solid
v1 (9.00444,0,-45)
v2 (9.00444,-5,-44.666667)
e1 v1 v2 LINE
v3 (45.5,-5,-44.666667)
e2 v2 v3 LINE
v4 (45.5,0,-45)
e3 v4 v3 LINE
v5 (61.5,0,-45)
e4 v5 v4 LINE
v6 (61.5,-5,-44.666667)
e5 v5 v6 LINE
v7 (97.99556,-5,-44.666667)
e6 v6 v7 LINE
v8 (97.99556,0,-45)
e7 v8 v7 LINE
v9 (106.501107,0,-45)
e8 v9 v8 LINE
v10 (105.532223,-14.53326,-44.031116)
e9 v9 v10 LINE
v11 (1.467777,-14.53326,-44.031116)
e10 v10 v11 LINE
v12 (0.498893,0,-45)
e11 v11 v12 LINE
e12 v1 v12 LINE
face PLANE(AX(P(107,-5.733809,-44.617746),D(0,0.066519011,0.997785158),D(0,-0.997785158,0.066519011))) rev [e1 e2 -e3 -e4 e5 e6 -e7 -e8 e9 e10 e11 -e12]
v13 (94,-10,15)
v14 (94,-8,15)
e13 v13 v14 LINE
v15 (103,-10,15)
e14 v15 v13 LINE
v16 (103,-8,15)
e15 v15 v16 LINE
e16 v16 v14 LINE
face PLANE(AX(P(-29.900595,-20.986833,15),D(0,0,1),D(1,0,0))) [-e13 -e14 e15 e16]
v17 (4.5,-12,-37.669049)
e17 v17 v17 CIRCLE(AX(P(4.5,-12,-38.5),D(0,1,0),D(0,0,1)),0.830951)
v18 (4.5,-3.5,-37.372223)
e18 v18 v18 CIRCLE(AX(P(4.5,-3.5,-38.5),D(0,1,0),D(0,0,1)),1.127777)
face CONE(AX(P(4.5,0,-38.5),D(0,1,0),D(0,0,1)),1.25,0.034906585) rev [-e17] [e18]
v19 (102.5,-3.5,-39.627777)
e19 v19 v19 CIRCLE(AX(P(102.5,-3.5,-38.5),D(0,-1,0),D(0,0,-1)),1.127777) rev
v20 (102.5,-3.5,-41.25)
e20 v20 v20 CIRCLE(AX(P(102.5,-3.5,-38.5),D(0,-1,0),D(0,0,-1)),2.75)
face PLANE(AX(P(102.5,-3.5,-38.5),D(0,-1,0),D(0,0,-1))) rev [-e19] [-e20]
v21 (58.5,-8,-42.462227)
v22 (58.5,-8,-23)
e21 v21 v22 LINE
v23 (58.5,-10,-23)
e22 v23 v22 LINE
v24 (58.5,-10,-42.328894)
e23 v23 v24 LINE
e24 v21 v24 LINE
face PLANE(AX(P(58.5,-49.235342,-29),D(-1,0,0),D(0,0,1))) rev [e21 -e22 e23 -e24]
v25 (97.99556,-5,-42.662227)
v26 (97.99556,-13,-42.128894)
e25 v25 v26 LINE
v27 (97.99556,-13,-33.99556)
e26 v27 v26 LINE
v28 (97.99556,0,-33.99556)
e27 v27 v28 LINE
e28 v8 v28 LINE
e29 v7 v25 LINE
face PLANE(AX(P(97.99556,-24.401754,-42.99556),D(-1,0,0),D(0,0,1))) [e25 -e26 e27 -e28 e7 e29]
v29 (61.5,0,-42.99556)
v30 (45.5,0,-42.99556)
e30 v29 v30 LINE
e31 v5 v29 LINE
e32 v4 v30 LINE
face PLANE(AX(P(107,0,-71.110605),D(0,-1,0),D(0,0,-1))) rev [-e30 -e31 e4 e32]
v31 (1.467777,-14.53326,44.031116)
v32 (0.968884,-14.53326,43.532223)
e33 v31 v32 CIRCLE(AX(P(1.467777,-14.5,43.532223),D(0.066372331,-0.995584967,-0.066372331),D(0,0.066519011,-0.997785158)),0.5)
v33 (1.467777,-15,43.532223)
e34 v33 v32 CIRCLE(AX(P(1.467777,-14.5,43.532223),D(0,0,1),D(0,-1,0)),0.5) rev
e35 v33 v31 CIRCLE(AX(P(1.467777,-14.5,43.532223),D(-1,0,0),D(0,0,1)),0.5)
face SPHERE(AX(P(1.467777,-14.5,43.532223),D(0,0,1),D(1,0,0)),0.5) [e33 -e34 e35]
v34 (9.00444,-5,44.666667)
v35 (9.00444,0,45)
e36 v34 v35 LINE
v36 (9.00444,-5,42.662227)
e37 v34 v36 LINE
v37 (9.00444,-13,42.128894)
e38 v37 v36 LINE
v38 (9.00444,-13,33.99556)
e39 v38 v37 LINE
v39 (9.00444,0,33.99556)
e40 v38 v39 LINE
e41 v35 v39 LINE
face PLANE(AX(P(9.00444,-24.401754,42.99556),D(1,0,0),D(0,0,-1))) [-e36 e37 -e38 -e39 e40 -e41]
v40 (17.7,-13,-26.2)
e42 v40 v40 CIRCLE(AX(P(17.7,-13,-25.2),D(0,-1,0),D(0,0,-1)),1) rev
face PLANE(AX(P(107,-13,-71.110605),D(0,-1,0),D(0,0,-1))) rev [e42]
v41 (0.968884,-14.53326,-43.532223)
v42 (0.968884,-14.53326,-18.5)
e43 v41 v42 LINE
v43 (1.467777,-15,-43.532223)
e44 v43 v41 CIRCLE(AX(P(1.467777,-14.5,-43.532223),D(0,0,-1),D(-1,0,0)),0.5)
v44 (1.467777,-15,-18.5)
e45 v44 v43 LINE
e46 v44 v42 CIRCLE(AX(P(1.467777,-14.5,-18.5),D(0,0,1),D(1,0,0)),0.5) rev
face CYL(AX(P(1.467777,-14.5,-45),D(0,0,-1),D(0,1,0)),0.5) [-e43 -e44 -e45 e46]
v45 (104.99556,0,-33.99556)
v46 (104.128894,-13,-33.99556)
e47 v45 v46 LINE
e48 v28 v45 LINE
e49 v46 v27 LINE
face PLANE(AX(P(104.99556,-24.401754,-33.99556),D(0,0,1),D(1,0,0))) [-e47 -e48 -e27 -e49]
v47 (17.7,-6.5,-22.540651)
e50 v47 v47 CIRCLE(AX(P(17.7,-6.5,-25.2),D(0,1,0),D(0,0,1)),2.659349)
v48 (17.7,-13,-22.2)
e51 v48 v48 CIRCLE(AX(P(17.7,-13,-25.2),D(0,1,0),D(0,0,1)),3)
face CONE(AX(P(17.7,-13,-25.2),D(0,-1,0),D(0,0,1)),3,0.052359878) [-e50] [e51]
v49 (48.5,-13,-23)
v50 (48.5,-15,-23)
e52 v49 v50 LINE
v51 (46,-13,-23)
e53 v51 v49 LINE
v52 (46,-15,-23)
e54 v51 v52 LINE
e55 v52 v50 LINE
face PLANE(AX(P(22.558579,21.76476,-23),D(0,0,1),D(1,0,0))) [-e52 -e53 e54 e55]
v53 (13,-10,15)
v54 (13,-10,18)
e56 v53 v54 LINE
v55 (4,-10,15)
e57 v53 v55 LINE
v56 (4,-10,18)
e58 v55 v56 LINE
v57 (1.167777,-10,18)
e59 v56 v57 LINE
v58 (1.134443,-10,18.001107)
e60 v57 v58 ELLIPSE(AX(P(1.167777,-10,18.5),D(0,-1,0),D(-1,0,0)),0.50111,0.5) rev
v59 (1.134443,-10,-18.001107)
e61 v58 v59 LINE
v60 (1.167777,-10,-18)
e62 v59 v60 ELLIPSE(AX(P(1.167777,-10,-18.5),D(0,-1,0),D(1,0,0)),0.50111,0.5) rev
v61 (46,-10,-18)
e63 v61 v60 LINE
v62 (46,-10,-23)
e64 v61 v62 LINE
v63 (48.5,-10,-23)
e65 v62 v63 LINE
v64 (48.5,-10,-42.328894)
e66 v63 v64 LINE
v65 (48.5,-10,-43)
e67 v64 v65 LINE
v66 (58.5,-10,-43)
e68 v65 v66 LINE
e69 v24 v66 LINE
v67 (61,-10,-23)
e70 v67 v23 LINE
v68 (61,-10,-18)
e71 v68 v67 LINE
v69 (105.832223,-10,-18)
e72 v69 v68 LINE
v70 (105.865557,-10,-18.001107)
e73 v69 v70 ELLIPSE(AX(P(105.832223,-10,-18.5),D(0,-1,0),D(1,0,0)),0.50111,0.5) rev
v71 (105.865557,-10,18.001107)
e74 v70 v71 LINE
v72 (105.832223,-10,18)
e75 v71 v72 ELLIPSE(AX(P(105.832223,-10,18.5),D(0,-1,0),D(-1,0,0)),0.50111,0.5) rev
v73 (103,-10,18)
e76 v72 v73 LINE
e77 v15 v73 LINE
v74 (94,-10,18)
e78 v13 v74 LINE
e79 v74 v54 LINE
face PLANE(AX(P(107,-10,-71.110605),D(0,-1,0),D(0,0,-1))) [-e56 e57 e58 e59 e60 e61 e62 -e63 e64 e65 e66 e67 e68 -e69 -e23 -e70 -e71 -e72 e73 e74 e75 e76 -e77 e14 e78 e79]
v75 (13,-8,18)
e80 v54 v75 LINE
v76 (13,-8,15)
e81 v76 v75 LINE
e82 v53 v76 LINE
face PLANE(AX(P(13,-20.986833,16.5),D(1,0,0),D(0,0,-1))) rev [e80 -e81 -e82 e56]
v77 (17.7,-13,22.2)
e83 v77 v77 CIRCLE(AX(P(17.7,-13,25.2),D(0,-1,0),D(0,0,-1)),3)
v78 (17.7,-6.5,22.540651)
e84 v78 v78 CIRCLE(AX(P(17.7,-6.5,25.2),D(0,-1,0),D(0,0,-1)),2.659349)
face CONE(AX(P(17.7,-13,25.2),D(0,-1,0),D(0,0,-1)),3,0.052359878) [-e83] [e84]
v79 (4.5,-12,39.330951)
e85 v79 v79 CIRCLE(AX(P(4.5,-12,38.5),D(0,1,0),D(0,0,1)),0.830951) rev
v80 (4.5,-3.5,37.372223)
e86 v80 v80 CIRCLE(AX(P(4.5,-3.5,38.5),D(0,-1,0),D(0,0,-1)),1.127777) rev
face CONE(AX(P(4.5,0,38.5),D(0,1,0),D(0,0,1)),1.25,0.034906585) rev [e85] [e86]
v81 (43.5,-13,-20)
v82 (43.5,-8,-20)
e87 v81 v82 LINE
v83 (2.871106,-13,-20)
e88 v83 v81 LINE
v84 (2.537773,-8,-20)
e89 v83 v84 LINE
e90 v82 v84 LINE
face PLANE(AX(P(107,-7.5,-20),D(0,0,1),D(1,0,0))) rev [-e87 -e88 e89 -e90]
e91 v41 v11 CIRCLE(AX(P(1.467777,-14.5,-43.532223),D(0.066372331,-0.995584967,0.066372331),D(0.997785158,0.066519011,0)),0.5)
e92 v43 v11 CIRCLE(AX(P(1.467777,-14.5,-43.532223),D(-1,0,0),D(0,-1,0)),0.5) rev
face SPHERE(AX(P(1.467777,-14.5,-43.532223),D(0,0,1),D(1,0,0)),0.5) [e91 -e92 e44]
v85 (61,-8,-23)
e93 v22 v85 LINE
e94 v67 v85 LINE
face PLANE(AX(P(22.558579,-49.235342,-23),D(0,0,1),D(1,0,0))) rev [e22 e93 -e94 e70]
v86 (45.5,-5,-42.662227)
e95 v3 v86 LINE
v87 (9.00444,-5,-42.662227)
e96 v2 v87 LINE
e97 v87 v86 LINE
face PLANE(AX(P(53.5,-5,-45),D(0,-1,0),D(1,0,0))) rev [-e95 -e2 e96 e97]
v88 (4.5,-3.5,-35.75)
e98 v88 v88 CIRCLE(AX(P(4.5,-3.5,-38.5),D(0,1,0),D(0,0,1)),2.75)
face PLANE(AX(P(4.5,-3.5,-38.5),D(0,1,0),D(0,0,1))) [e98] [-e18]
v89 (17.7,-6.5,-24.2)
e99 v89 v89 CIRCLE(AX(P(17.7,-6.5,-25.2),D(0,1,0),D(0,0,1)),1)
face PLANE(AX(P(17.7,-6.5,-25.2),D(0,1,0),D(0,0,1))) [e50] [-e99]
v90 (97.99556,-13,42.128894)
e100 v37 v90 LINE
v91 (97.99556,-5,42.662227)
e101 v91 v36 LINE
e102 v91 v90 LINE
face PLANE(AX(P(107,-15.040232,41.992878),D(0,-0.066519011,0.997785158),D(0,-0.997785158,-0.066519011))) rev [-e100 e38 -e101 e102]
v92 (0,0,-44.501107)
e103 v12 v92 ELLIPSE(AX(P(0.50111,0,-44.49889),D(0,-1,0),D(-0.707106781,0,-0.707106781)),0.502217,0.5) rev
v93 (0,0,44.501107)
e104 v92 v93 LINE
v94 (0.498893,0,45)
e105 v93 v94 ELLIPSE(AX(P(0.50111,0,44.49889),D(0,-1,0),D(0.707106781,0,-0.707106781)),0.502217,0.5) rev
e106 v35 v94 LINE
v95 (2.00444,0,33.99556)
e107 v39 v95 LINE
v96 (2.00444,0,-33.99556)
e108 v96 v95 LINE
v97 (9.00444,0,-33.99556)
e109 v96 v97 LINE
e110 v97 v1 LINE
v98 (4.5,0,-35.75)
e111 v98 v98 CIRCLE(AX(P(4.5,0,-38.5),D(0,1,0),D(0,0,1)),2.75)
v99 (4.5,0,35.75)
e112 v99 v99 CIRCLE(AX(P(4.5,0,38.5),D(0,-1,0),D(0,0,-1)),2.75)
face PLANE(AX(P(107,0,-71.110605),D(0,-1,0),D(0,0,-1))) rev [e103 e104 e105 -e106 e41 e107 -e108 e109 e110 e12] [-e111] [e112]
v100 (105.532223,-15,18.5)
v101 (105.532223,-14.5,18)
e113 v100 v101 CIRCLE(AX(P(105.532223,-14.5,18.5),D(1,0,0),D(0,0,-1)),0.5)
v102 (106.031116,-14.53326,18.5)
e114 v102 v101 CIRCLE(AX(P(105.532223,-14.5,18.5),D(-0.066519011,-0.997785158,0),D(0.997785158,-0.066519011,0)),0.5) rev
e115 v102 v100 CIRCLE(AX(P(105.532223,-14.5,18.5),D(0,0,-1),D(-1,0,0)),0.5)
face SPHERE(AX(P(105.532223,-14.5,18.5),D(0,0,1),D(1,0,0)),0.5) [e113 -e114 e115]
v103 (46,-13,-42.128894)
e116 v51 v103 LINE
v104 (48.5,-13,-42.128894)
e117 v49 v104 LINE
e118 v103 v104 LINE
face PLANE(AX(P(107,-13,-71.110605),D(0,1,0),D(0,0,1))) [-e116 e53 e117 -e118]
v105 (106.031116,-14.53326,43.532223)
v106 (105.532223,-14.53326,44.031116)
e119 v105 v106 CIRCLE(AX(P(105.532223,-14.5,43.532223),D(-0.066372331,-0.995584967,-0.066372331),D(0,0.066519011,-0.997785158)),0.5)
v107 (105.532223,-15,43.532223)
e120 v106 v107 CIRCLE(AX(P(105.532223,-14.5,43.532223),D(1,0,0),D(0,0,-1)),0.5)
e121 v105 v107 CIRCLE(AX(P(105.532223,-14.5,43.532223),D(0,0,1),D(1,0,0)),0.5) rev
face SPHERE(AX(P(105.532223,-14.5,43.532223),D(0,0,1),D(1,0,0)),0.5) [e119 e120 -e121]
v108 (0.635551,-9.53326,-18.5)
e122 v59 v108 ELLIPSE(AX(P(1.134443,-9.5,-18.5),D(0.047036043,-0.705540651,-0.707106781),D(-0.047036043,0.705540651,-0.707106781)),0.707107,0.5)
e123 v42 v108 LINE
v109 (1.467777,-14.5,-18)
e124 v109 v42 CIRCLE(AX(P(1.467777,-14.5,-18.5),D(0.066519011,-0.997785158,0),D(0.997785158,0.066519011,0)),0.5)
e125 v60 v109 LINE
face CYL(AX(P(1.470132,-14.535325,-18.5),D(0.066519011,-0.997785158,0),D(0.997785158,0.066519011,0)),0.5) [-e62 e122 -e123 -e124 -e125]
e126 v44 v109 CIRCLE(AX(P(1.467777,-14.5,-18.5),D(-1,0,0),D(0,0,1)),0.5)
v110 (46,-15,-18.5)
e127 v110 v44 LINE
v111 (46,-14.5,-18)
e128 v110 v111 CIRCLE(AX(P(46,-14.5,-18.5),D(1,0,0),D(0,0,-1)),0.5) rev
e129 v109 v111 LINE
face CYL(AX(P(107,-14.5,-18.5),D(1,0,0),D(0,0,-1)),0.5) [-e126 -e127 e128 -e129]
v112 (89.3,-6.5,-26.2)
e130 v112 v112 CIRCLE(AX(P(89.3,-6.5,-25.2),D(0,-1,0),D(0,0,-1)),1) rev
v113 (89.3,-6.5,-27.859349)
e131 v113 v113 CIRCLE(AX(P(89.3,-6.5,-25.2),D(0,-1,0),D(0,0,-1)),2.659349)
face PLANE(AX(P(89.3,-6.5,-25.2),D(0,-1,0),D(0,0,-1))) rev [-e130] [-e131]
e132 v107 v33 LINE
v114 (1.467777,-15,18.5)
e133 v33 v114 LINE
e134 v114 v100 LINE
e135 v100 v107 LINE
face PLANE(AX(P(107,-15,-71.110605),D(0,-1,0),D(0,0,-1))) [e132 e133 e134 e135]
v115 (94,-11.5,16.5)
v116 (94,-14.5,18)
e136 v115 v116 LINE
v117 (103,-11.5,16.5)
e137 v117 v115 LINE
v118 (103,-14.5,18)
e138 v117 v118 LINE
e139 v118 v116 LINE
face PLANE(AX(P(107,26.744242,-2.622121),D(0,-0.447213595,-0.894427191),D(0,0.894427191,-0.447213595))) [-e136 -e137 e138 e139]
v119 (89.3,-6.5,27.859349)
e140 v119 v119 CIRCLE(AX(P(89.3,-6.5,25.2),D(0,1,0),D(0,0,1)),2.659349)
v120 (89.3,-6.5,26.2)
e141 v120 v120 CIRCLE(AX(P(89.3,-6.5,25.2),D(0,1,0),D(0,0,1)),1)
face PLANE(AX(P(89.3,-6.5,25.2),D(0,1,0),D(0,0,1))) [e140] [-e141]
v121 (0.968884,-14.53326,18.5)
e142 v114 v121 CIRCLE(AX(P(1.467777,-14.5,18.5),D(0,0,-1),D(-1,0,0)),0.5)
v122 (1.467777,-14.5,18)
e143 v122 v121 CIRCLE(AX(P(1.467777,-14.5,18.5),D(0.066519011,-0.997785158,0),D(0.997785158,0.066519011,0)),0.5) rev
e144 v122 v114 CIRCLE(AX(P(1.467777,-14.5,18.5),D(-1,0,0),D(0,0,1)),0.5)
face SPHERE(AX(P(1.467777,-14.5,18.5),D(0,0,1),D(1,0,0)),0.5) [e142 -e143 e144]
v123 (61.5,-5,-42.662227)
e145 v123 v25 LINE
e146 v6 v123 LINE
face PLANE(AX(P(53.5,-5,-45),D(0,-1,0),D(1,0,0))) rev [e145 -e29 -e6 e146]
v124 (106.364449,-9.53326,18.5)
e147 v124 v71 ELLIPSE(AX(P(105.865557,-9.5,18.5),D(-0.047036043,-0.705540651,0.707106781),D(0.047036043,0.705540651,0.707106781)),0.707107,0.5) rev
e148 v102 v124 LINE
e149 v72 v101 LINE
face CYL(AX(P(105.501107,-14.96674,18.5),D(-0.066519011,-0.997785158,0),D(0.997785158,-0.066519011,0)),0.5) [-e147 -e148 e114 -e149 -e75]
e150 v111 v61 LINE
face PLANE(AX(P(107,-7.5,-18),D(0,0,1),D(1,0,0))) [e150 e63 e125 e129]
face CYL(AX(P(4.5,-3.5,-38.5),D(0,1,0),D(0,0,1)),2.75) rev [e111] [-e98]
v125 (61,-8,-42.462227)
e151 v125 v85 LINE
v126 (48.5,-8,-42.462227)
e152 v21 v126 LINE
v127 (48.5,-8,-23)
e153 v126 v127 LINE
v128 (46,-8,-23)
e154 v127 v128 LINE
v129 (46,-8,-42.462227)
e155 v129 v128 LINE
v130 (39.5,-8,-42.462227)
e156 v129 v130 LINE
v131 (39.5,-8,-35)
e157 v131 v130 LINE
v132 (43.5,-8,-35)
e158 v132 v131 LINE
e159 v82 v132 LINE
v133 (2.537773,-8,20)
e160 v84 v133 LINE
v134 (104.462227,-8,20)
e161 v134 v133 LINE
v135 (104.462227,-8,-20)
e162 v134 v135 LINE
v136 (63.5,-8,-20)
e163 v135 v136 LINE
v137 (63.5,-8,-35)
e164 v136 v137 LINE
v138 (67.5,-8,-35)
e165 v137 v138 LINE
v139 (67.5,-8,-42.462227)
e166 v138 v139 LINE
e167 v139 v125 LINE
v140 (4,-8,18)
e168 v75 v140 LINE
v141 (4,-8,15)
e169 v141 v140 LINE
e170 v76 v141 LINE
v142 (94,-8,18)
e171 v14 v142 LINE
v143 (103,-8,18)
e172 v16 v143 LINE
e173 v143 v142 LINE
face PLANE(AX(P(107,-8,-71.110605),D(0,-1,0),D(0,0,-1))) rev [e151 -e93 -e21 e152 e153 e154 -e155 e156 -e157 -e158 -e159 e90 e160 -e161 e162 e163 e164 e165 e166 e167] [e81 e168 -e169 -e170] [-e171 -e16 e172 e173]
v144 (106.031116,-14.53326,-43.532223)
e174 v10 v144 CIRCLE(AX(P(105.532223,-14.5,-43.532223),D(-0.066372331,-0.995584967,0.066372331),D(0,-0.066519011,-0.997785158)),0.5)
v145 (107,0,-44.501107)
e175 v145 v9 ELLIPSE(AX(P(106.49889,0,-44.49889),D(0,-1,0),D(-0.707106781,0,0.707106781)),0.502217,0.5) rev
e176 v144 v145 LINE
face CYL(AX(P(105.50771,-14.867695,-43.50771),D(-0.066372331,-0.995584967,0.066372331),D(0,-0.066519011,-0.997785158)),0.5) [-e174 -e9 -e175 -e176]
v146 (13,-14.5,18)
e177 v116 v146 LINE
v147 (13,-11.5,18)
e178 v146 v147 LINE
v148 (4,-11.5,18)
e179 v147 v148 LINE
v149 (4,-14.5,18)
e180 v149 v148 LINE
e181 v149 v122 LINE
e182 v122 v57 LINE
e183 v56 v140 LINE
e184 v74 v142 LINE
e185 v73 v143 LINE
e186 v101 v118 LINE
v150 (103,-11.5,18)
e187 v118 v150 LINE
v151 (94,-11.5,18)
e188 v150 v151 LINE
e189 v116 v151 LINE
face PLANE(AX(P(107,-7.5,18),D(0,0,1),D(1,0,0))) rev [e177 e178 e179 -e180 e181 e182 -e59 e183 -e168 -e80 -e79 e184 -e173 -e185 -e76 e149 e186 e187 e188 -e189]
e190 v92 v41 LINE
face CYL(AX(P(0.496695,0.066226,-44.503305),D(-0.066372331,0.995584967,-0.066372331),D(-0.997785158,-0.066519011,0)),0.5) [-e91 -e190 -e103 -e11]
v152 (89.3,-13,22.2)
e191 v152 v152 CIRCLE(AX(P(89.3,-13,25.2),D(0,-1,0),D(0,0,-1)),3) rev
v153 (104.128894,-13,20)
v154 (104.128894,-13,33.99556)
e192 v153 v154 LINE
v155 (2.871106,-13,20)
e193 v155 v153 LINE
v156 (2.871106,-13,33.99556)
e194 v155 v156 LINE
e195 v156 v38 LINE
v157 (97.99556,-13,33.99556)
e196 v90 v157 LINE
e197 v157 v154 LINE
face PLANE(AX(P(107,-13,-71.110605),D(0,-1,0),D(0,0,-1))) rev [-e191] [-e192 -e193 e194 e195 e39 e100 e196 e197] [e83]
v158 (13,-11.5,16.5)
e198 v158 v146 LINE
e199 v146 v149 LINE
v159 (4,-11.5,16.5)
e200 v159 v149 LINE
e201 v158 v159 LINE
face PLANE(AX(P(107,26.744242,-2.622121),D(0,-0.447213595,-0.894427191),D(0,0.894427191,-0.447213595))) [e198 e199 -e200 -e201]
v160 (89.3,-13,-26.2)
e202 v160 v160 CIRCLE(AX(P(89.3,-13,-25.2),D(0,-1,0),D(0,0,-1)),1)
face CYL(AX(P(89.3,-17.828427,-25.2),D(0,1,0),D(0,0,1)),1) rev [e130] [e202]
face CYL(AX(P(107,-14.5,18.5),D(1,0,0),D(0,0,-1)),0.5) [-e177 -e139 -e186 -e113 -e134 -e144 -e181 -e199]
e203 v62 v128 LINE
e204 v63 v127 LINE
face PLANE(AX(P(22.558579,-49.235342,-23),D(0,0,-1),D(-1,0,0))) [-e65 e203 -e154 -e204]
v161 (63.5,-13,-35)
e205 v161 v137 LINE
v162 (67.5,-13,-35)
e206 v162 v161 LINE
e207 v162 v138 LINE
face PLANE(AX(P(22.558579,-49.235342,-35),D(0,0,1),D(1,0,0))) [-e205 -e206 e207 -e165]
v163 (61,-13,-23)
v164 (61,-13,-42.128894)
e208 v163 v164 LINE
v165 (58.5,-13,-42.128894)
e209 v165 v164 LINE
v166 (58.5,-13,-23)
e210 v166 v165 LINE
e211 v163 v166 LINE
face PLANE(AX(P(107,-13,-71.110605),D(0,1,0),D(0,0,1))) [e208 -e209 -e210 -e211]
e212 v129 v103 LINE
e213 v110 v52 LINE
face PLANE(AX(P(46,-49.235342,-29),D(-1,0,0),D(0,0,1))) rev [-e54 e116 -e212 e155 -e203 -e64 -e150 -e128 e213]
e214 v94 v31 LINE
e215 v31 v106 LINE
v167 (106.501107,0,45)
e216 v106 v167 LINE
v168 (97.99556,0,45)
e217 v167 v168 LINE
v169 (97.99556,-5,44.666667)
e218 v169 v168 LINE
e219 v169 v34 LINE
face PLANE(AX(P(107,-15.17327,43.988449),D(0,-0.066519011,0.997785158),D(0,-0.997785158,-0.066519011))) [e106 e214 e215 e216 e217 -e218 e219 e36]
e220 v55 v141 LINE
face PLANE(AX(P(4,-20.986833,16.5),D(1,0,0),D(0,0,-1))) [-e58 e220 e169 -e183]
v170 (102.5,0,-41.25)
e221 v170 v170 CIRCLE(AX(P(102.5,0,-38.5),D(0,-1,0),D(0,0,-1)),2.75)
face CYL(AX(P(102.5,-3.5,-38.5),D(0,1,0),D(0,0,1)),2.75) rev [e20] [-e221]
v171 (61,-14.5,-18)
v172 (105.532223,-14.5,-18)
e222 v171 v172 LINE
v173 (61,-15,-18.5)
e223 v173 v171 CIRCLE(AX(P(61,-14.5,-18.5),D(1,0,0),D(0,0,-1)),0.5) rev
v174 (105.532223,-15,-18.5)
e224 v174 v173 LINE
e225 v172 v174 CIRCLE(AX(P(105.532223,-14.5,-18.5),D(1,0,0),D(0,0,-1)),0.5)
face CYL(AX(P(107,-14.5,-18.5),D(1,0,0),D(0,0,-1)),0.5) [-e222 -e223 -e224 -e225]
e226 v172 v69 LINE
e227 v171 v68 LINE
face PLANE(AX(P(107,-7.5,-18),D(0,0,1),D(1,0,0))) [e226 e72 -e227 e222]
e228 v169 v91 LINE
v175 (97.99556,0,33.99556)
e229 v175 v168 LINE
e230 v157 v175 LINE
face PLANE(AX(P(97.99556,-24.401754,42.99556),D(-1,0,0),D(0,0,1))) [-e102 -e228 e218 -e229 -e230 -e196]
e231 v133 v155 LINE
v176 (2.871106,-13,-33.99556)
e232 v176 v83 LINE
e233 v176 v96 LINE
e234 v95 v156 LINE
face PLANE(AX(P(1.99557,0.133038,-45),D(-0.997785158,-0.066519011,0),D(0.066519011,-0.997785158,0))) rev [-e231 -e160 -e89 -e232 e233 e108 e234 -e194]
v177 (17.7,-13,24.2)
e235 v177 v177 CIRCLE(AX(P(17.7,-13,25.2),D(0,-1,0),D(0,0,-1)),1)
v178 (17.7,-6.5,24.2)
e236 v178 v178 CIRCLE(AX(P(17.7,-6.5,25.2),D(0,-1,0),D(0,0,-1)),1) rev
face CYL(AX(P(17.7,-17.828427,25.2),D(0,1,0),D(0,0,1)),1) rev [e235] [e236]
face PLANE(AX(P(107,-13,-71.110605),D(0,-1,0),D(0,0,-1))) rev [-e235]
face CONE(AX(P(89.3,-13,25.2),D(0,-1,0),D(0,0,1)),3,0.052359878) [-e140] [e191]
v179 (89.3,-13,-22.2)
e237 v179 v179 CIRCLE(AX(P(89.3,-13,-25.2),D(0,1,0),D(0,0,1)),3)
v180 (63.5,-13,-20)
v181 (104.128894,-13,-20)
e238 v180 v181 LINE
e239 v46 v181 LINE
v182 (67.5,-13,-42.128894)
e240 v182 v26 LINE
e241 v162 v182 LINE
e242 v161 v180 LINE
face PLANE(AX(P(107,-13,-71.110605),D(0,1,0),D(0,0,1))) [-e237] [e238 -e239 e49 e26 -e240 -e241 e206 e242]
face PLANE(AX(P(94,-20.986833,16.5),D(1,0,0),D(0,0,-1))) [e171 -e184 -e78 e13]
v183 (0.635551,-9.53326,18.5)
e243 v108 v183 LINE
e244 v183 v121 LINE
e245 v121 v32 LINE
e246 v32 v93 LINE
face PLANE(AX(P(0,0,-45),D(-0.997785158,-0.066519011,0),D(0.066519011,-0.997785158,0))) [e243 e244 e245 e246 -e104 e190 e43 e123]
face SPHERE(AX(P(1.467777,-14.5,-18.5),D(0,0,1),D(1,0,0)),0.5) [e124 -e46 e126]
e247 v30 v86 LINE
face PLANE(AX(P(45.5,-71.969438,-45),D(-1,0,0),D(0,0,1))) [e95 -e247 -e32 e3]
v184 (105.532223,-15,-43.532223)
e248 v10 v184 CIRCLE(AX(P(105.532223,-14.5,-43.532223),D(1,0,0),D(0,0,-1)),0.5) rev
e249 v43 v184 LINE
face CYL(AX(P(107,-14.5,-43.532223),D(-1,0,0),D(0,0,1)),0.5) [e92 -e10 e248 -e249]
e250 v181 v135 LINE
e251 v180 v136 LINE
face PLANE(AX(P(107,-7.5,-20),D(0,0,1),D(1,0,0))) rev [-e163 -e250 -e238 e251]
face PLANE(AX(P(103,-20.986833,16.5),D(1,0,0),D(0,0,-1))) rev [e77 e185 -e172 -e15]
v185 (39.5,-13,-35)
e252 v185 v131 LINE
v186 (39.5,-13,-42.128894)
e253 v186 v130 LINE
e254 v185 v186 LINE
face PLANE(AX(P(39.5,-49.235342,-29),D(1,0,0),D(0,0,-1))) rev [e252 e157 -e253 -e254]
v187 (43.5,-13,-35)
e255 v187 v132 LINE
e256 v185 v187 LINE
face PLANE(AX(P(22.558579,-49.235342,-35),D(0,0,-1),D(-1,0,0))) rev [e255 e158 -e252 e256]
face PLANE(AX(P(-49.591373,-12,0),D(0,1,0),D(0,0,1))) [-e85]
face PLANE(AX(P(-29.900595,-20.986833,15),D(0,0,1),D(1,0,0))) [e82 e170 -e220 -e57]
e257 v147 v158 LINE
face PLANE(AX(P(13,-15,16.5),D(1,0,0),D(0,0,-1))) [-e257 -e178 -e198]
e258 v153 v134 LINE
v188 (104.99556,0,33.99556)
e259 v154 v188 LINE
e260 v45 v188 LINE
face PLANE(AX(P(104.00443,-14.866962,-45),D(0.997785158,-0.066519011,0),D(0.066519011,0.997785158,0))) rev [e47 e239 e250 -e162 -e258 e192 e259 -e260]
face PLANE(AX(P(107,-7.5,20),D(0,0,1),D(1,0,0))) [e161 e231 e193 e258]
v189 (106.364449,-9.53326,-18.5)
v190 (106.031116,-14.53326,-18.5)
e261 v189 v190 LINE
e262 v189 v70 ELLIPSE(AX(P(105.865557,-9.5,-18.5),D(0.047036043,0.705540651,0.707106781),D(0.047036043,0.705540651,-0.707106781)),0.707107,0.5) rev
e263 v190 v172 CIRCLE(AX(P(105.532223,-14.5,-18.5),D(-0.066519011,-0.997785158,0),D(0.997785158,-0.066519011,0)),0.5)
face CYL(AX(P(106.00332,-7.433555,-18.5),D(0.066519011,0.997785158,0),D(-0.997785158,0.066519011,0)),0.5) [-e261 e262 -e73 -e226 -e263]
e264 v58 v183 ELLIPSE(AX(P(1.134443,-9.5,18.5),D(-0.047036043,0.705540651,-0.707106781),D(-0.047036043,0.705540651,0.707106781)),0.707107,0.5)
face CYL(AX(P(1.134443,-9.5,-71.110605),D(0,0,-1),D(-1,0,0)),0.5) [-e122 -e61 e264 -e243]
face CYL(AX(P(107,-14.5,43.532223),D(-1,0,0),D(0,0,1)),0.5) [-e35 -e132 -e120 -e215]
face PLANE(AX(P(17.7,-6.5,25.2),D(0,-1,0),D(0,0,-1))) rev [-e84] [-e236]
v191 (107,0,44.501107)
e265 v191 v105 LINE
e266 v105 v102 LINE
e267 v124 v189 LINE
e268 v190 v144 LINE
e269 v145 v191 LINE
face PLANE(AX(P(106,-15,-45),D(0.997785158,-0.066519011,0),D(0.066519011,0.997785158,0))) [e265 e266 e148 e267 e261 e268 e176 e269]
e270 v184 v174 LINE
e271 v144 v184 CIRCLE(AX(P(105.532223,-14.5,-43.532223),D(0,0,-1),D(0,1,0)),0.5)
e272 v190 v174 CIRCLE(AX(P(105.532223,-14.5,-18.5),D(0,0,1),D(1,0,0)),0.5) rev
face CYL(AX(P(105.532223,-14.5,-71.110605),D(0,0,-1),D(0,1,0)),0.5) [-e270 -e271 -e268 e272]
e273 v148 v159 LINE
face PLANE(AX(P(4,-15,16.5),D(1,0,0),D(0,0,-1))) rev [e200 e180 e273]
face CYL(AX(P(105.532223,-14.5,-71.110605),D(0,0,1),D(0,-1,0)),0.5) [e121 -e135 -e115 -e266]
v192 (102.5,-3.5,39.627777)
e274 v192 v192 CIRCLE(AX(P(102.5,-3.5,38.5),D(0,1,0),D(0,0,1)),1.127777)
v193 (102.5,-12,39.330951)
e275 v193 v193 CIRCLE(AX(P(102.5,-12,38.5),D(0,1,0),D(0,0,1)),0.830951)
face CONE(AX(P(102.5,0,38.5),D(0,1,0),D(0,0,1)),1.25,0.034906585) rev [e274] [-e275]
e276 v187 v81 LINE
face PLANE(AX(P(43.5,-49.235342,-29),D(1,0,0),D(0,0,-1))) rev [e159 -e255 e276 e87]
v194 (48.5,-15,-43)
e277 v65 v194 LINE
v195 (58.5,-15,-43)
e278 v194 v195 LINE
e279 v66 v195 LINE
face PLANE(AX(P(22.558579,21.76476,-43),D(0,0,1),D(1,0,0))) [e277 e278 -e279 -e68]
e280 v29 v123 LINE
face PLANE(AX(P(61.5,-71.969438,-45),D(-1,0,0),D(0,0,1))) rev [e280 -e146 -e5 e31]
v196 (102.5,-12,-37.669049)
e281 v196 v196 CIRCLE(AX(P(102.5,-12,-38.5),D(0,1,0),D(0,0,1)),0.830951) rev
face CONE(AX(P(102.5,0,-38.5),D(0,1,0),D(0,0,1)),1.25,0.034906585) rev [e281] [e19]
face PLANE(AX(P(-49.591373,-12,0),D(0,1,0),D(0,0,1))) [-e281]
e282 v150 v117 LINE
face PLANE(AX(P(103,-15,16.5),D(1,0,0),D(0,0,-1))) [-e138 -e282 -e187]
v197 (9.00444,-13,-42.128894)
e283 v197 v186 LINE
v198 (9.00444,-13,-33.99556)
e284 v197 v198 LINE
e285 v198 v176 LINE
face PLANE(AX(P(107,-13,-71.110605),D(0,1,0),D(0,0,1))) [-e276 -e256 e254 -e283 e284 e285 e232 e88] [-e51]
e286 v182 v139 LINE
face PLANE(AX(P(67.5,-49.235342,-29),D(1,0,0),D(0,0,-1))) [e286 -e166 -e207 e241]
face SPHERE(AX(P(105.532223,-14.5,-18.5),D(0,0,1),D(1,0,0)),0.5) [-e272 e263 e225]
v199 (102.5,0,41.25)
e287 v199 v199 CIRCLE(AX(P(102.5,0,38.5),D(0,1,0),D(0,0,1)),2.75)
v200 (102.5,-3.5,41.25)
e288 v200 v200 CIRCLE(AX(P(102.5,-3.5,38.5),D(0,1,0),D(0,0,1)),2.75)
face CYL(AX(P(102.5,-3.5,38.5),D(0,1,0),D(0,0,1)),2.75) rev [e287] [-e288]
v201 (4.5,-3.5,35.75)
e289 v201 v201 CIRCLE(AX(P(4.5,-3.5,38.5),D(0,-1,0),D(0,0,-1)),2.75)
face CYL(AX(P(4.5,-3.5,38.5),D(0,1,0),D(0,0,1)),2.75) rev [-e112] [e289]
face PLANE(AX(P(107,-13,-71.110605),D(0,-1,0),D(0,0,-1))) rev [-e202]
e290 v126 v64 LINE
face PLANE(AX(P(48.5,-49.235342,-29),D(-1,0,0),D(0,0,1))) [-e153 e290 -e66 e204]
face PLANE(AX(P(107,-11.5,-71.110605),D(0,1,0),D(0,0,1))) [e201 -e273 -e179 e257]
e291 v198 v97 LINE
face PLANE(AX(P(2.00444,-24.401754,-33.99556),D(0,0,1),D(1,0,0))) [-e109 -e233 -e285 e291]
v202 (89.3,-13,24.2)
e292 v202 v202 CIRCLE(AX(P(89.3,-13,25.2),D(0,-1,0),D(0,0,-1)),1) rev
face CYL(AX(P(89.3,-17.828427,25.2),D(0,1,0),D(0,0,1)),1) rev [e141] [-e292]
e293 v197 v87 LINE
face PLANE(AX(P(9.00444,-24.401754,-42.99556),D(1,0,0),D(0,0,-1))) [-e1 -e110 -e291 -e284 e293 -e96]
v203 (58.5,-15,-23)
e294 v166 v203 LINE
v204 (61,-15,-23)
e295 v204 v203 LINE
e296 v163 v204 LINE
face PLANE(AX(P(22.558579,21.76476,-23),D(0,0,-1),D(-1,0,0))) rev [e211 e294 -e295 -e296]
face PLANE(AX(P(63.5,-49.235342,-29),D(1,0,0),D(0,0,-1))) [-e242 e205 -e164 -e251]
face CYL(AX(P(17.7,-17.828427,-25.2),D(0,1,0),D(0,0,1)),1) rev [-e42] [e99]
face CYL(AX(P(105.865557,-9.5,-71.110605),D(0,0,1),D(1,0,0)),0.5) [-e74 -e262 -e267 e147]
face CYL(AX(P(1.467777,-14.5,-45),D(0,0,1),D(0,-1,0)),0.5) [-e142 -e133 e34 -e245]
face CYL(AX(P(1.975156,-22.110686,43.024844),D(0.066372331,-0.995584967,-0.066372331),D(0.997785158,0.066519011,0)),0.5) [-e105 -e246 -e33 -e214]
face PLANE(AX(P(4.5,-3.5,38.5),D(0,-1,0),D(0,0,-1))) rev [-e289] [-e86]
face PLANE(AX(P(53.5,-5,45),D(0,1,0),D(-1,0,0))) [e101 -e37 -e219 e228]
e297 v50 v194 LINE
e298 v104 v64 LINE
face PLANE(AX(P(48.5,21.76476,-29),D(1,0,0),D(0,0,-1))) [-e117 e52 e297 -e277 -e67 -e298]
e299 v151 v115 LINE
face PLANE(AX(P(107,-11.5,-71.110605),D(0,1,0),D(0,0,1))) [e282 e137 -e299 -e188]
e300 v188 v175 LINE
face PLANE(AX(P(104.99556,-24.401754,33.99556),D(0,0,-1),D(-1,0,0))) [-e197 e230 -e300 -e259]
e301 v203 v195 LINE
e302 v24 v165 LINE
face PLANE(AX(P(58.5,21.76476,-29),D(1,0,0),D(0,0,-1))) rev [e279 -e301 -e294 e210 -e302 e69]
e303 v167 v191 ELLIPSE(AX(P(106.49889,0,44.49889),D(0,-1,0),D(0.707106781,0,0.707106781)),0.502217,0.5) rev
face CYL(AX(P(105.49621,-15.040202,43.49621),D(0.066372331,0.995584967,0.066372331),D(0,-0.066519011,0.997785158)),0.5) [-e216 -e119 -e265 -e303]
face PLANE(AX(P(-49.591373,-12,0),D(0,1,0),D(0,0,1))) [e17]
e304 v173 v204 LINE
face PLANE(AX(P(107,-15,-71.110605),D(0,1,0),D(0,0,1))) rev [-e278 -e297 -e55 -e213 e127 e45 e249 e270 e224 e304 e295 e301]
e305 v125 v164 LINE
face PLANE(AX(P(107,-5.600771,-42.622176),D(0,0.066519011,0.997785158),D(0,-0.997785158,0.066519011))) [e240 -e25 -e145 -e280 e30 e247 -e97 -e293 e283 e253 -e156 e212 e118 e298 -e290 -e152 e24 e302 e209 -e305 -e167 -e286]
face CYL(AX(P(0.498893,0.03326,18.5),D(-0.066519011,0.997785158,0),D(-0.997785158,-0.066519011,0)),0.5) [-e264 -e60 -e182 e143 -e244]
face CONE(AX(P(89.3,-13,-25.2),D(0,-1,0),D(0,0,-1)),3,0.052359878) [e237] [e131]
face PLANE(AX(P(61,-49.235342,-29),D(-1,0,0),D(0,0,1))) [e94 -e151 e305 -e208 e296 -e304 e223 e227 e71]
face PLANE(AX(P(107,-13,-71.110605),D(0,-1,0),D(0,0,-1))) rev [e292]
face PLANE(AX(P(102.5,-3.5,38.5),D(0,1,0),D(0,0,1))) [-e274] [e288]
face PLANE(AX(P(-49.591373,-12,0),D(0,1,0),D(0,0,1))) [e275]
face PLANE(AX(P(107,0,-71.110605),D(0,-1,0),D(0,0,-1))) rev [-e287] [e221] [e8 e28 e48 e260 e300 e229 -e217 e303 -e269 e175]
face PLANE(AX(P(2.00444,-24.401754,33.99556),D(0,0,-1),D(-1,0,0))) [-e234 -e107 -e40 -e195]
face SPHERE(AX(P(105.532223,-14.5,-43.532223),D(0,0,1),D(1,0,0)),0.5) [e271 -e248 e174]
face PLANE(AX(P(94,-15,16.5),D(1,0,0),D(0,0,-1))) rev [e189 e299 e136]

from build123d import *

# Parameters (mm, degrees)
EXTRUDE_1_DEPTH               = 107
CUT_EXTRUDE_2_DEPTH           = 118.042727241
CUT_EXTRUDE_2_DEPTH_BACK      = 118.042727241
SKETCH_3_OUTSIDE_W            = 137.124
SKETCH_3_OUTSIDE_H            = 45.124
FILLET_2_R                    = 0.5
SHELL_START                   = -42.995560483
SHELL_3_DEPTH                 = 85.991120966
SHELL_3_2_DEPTH               = 22.995560483
SHELL_START_2                 = 20
SHELL_3_3_DEPTH               = 22.995560483
SHELL_START_3                 = 1
SHELL_3_4_DEPTH               = 105
SKETCH_4_W                    = 7
SKETCH_4_H                    = 9
EXTRUDE_2_DEPTH               = 13
SKETCH_5_W                    = 36.495560483
SKETCH_5_H                    = 5
CUT_EXTRUDE_3_DEPTH           = 118.042727241
SKETCH_5_5_W                  = 36.495560483
SKETCH_5_5_H                  = 5
SKETCH_5_5_W_2                = 8
CUT_EXTRUDE_4_DEPTH           = 118.042727241
EXTRUDE_START                 = -8
SKETCH_6_W                    = 2.5
SKETCH_6_H                    = 3
EXTRUDE_4_DEPTH               = 5
CUT_EXTRUDE_START             = -15
CUT_EXTRUDE_5_DEPTH           = 5
EXTRUDE_5_DEPTH               = 107
CUT_EXTRUDE_START_2           = -10
SKETCH_7_W                    = 4
SKETCH_7_H                    = 3
SKETCH_7_W_2                  = 81
CUT_EXTRUDE_6_DEPTH           = 108.042727241
SKETCH_7_3_W                  = 9
SKETCH_7_3_H                  = 3
CUT_EXTRUDE_7_DEPTH           = 11.5
SKETCH_8_R                    = 2.75
CUT_EXTRUDE_8_DEPTH           = 3.5
SKETCH_8_3_R                  = 1.25
CUT_EXTRUDE_9_DEPTH           = 12
CUT_EXTRUDE_9_DRAFT           = -2
CUT_EXTRUDE_9_PROFILE_2_DEPTH = 12
CUT_EXTRUDE_9_PROFILE_2_DRAFT = -2
CUT_EXTRUDE_9_PROFILE_3_DEPTH = 12
CUT_EXTRUDE_9_PROFILE_3_DRAFT = -2
CUT_EXTRUDE_9_PROFILE_4_DEPTH = 12
CUT_EXTRUDE_9_PROFILE_4_DRAFT = -2
EXTRUDE_START_2               = -13
SKETCH_9_R                    = 3
EXTRUDE_6_DEPTH               = 6.5
EXTRUDE_6_DRAFT               = 3
EXTRUDE_6_PROFILE_2_DEPTH     = 6.5
EXTRUDE_6_PROFILE_2_DRAFT     = 3
EXTRUDE_6_PROFILE_3_DEPTH     = 6.5
EXTRUDE_6_PROFILE_3_DRAFT     = 3
EXTRUDE_6_PROFILE_4_DEPTH     = 6.5
EXTRUDE_6_PROFILE_4_DRAFT     = 3
SKETCH_9_3_R                  = 1
CUT_EXTRUDE_10_DEPTH          = 13


with BuildPart() as part:
    # Эскиз1 → Бобышка-Вытянуть1 (new body)
    with BuildSketch(Plane(origin=(0, 0, 0), x_dir=(0, 0, -1), z_dir=(1, 0, 0))):
        Polygon((18, -15), (44, -15), (45, 0), (-45, 0), (-44, -15), (-18, -15), (-18, -10), (18, -10), align=None)
    extrude(amount=EXTRUDE_1_DEPTH)

    # Эскиз3 outside → Вырез-Вытянуть2 (cut, two sides: drawn at the far end of the back side and taken through both)
    with BuildSketch(Plane.XY.offset(-CUT_EXTRUDE_2_DEPTH_BACK)):
        with Locations((53.5, -7.5)):
            Rectangle(SKETCH_3_OUTSIDE_W, SKETCH_3_OUTSIDE_H)
        Polygon((0, 0), (1, -15), (106, -15), (107, 0), align=None, mode=Mode.SUBTRACT)
    extrude(amount=CUT_EXTRUDE_2_DEPTH + CUT_EXTRUDE_2_DEPTH_BACK, mode=Mode.SUBTRACT)

    # Скругление2
    fillet_2_edges = [part.edges().sort_by_distance(p)[0] for p in [
        (53.5, -15, 18),
        (53.5, -15, 44),
        (53.5, -15, -44),
        (53.5, -15, -18),
        (1, -15, -31),
        (1, -15, 31),
        (106, -15, -31),
        (106.166666667, -12.5, -18),
        (106.333333333, -10, 0),
        (106, -15, 31),
        (106.5, -7.5, 44.5),
        (106.166666667, -12.5, 18),
        (0.5, -7.5, 44.5),
        (0.666666667, -10, 0),
        (0.833333333, -12.5, -18),
        (0.833333333, -12.5, 18),
        (106.5, -7.5, -44.5),
        (0.5, -7.5, -44.5),
    ]]
    fillet(fillet_2_edges, radius=FILLET_2_R)

    # Оболочка3: read off the stored shape, not the designer's step
    # Оболочка3 outline → Оболочка3 (cut)
    with BuildSketch(Plane.XY.offset(SHELL_START)):
        Polygon((2.004439517, 0), (2.537772851, -8), (104.46222715, -8), (104.995560483, 0), align=None)
    extrude(amount=SHELL_3_DEPTH, mode=Mode.SUBTRACT)

    # Shell 3 2 outline → Shell 3 2 (cut)
    with BuildSketch(Plane.XY.offset(SHELL_START)):
        Polygon((104.46222715, -8), (2.53777285, -8), (2.871106184, -13), (104.128893816, -13), align=None)
    extrude(amount=SHELL_3_2_DEPTH, mode=Mode.SUBTRACT)

    # Shell 3 3 outline → Shell 3 3 (cut)
    with BuildSketch(Plane.XY.offset(SHELL_START_2)):
        Polygon((104.46222715, -8), (2.53777285, -8), (2.871106184, -13), (104.128893816, -13), align=None)
    extrude(amount=SHELL_3_3_DEPTH, mode=Mode.SUBTRACT)

    # Shell 3 4 outline → Shell 3 4 (add)
    with BuildSketch(Plane.YZ.offset(SHELL_START_3)):
        Polygon((-13, -42.995560483), (0, -42.995560483), (-13, -42.128893816), align=None)
        Polygon((-13, 42.128893816), (0, 42.995560483), (-13, 42.995560483), align=None)
    extrude(amount=SHELL_3_4_DEPTH)

    # Эскиз4 → Бобышка-Вытянуть2 (add)
    with BuildSketch(Plane(origin=(0, 0, 0), x_dir=(1, 0, 0), z_dir=(0, 1, 0))):
        with Locations((101.495560483, 38.495560483)):
            Rectangle(SKETCH_4_W, SKETCH_4_H)
        with Locations((5.504439517, 38.495560483)):
            Rectangle(SKETCH_4_W, SKETCH_4_H)
        with Locations((101.495560483, -38.495560483)):
            Rectangle(SKETCH_4_W, SKETCH_4_H)
        with Locations((5.504439517, -38.495560483)):
            Rectangle(SKETCH_4_W, SKETCH_4_H)
    extrude(amount=-EXTRUDE_2_DEPTH)

    # Эскиз5 → Вырез-Вытянуть3 (cut, through all)
    with BuildSketch(Plane.XY):
        with Locations((27.252219759, -2.5)):
            Rectangle(SKETCH_5_W, SKETCH_5_H)
        with Locations((79.747780242, -2.5)):
            Rectangle(SKETCH_5_W, SKETCH_5_H)
    extrude(amount=-CUT_EXTRUDE_3_DEPTH, mode=Mode.SUBTRACT)

    # Эскиз5<5> → Вырез-Вытянуть4 (cut, through all)
    with BuildSketch(Plane.XY):
        with Locations((79.747780242, -2.5)):
            Rectangle(SKETCH_5_5_W, SKETCH_5_5_H)
        with Locations((57.5, -2.5)):
            Rectangle(SKETCH_5_5_W_2, SKETCH_5_5_H)
        with Locations((49.5, -2.5)):
            Rectangle(SKETCH_5_5_W_2, SKETCH_5_5_H)
        with Locations((27.252219759, -2.5)):
            Rectangle(SKETCH_5_5_W, SKETCH_5_5_H)
    extrude(amount=CUT_EXTRUDE_4_DEPTH, mode=Mode.SUBTRACT)

    # Эскиз6 → Бобышка-Вытянуть4 (add)
    with BuildSketch(Plane(origin=(0, 0, 0), x_dir=(1, 0, 0), z_dir=(0, 1, 0)).offset(EXTRUDE_START)):
        Polygon((67.5, 43), (61, 43), (61, 23), (63.5, 23), (63.5, 35), (67.5, 35), align=None)
        with Locations((62.25, 21.5)):
            Rectangle(SKETCH_6_W, SKETCH_6_H)
        Polygon((58.5, 43), (53.5, 43), (53.5, 20), (61, 20), (61, 23), (58.5, 23), align=None)
        Polygon((53.5, 20), (53.5, 43), (48.5, 43), (48.5, 23), (46, 23), (46, 20), align=None)
        with Locations((44.75, 21.5)):
            Rectangle(SKETCH_6_W, SKETCH_6_H)
        Polygon((46, 23), (46, 43), (39.5, 43), (39.5, 35), (43.5, 35), (43.5, 23), align=None)
    extrude(amount=-EXTRUDE_4_DEPTH)

    # Вырез-Вытянуть5: read off the stored shape, not the designer's step
    # Вырез-Вытянуть5 outline → Вырез-Вытянуть5 (cut)
    with BuildSketch(Plane(origin=(0, 0, 0), x_dir=(1, 0, 0), z_dir=(0, 1, 0)).offset(CUT_EXTRUDE_START)):
        Polygon((48.5, 23), (46, 23), (46, 18), (61, 18), (61, 23), (58.5, 23), (58.5, 43), (48.5, 43), align=None)
    extrude(amount=CUT_EXTRUDE_5_DEPTH, mode=Mode.SUBTRACT)

    # Эскиз1<3> → Бобышка-Вытянуть5 (add)
    with BuildSketch(Plane(origin=(0, 0, 0), x_dir=(0, 0, -1), z_dir=(1, 0, 0))):
        Polygon((-16.5, -11.5), (-18, -11.5), (-18, -14.5), align=None)
    extrude(amount=EXTRUDE_5_DEPTH)

    # Эскиз7 → Вырез-Вытянуть6 (cut, through all)
    with BuildSketch(Plane(origin=(0, 0, 0), x_dir=(1, 0, 0), z_dir=(0, 1, 0)).offset(CUT_EXTRUDE_START_2)):
        with Locations((2, -16.5)):
            Rectangle(SKETCH_7_W, SKETCH_7_H)
        with Locations((53.5, -16.5)):
            Rectangle(SKETCH_7_W_2, SKETCH_7_H)
        with Locations((105, -16.5)):
            Rectangle(SKETCH_7_W, SKETCH_7_H)
    extrude(amount=-CUT_EXTRUDE_6_DEPTH, mode=Mode.SUBTRACT)

    # Эскиз7<3> → Вырез-Вытянуть7 (cut)
    with BuildSketch(Plane(origin=(0, 0, 0), x_dir=(1, 0, 0), z_dir=(0, 1, 0))):
        with Locations((98.5, -16.5)):
            Rectangle(SKETCH_7_3_W, SKETCH_7_3_H)
        with Locations((8.5, -16.5)):
            Rectangle(SKETCH_7_3_W, SKETCH_7_3_H)
    extrude(amount=-CUT_EXTRUDE_7_DEPTH, mode=Mode.SUBTRACT)

    # Эскиз8 → Вырез-Вытянуть8 (cut)
    with BuildSketch(Plane(origin=(0, 0, 0), x_dir=(1, 0, 0), z_dir=(0, 1, 0))):
        with Locations(Location((4.5, 38.5, 0), (0, 0, 270))):
            Circle(SKETCH_8_R)
        with Locations(Location((102.5, 38.5, 0), (0, 0, 90))):
            Circle(SKETCH_8_R)
        with Locations(Location((102.5, -38.5, 0), (0, 0, 270))):
            Circle(SKETCH_8_R)
        with Locations(Location((4.5, -38.5, 0), (0, 0, 90))):
            Circle(SKETCH_8_R)
    extrude(amount=-CUT_EXTRUDE_8_DEPTH, mode=Mode.SUBTRACT)


with BuildPart() as cut_extrude_9_tool:
    # Эскиз8<3> → Вырез-Вытянуть9 (with draft: the straight prism first)
    with BuildSketch(Plane(origin=(0, 0, 0), x_dir=(1, 0, 0), z_dir=(0, 1, 0))):
        with Locations((102.5, 38.5)):
            Circle(SKETCH_8_3_R)
    extrude(amount=-CUT_EXTRUDE_9_DEPTH)
    # Вырез-Вытянуть9: the draft: its side faces are tilted about the plane it starts from
    cut_extrude_9_sides = [cut_extrude_9_tool.faces().sort_by_distance(p)[0] for p in [
        (101.25, -6, -38.5),
    ]]
    draft(cut_extrude_9_sides, Plane(origin=(0, 0, 0), x_dir=(1, 0, 0), z_dir=(0, 1, 0)), CUT_EXTRUDE_9_DRAFT)


with BuildPart() as part_1:
    add(part.part)

    # Вырез-Вытянуть9: cut by cut_extrude_9_tool
    add(cut_extrude_9_tool.part, mode=Mode.SUBTRACT)


with BuildPart() as cut_extrude_9_profile_2_tool:
    # Эскиз8<3> → Вырез-Вытянуть9 profile 2 (with draft: the straight prism first)
    with BuildSketch(Plane(origin=(0, 0, 0), x_dir=(1, 0, 0), z_dir=(0, 1, 0))):
        with Locations((4.5, 38.5)):
            Circle(SKETCH_8_3_R)
    extrude(amount=-CUT_EXTRUDE_9_PROFILE_2_DEPTH)
    # Вырез-Вытянуть9 profile 2: the draft: its side faces are tilted about the plane it starts from
    cut_extrude_9_profile_2_sides = [cut_extrude_9_profile_2_tool.faces().sort_by_distance(p)[0] for p in [
        (3.25, -6, -38.5),
    ]]
    draft(cut_extrude_9_profile_2_sides, Plane(origin=(0, 0, 0), x_dir=(1, 0, 0), z_dir=(0, 1, 0)), CUT_EXTRUDE_9_PROFILE_2_DRAFT)


with BuildPart() as part_2:
    add(part_1.part)

    # Вырез-Вытянуть9 profile 2: cut by cut_extrude_9_profile_2_tool
    add(cut_extrude_9_profile_2_tool.part, mode=Mode.SUBTRACT)


with BuildPart() as cut_extrude_9_profile_3_tool:
    # Эскиз8<3> → Вырез-Вытянуть9 profile 3 (with draft: the straight prism first)
    with BuildSketch(Plane(origin=(0, 0, 0), x_dir=(1, 0, 0), z_dir=(0, 1, 0))):
        with Locations((4.5, -38.5)):
            Circle(SKETCH_8_3_R)
    extrude(amount=-CUT_EXTRUDE_9_PROFILE_3_DEPTH)
    # Вырез-Вытянуть9 profile 3: the draft: its side faces are tilted about the plane it starts from
    cut_extrude_9_profile_3_sides = [cut_extrude_9_profile_3_tool.faces().sort_by_distance(p)[0] for p in [
        (3.25, -6, 38.5),
    ]]
    draft(cut_extrude_9_profile_3_sides, Plane(origin=(0, 0, 0), x_dir=(1, 0, 0), z_dir=(0, 1, 0)), CUT_EXTRUDE_9_PROFILE_3_DRAFT)


with BuildPart() as part_3:
    add(part_2.part)

    # Вырез-Вытянуть9 profile 3: cut by cut_extrude_9_profile_3_tool
    add(cut_extrude_9_profile_3_tool.part, mode=Mode.SUBTRACT)


with BuildPart() as cut_extrude_9_profile_4_tool:
    # Эскиз8<3> → Вырез-Вытянуть9 profile 4 (with draft: the straight prism first)
    with BuildSketch(Plane(origin=(0, 0, 0), x_dir=(1, 0, 0), z_dir=(0, 1, 0))):
        with Locations((102.5, -38.5)):
            Circle(SKETCH_8_3_R)
    extrude(amount=-CUT_EXTRUDE_9_PROFILE_4_DEPTH)
    # Вырез-Вытянуть9 profile 4: the draft: its side faces are tilted about the plane it starts from
    cut_extrude_9_profile_4_sides = [cut_extrude_9_profile_4_tool.faces().sort_by_distance(p)[0] for p in [
        (101.25, -6, 38.5),
    ]]
    draft(cut_extrude_9_profile_4_sides, Plane(origin=(0, 0, 0), x_dir=(1, 0, 0), z_dir=(0, 1, 0)), CUT_EXTRUDE_9_PROFILE_4_DRAFT)


with BuildPart() as part_4:
    add(part_3.part)

    # Вырез-Вытянуть9 profile 4: cut by cut_extrude_9_profile_4_tool
    add(cut_extrude_9_profile_4_tool.part, mode=Mode.SUBTRACT)


with BuildPart() as extrude_6_tool:
    # Эскиз9 → Бобышка-Вытянуть6 (with draft: the straight prism first)
    with BuildSketch(Plane(origin=(0, 0, 0), x_dir=(1, 0, 0), z_dir=(0, 1, 0)).offset(EXTRUDE_START_2)):
        with Locations((17.7, 25.2)):
            Circle(SKETCH_9_R)
    extrude(amount=EXTRUDE_6_DEPTH)
    # Бобышка-Вытянуть6: the draft: its side faces are tilted about the plane it starts from
    extrude_6_sides = [extrude_6_tool.faces().sort_by_distance(p)[0] for p in [
        (14.7, -9.75, -25.2),
    ]]
    draft(extrude_6_sides, Plane(origin=(0, 0, 0), x_dir=(1, 0, 0), z_dir=(0, 1, 0)).offset(EXTRUDE_START_2), EXTRUDE_6_DRAFT)


with BuildPart() as part_5:
    add(part_4.part)

    # Бобышка-Вытянуть6: add extrude_6_tool
    add(extrude_6_tool.part)


with BuildPart() as extrude_6_profile_2_tool:
    # Эскиз9 → Бобышка-Вытянуть6 profile 2 (with draft: the straight prism first)
    with BuildSketch(Plane(origin=(0, 0, 0), x_dir=(1, 0, 0), z_dir=(0, 1, 0)).offset(EXTRUDE_START_2)):
        with Locations((89.3, 25.2)):
            Circle(SKETCH_9_R)
    extrude(amount=EXTRUDE_6_PROFILE_2_DEPTH)
    # Бобышка-Вытянуть6 profile 2: the draft: its side faces are tilted about the plane it starts from
    extrude_6_profile_2_sides = [extrude_6_profile_2_tool.faces().sort_by_distance(p)[0] for p in [
        (86.3, -9.75, -25.2),
    ]]
    draft(extrude_6_profile_2_sides, Plane(origin=(0, 0, 0), x_dir=(1, 0, 0), z_dir=(0, 1, 0)).offset(EXTRUDE_START_2), EXTRUDE_6_PROFILE_2_DRAFT)


with BuildPart() as part_6:
    add(part_5.part)

    # Бобышка-Вытянуть6 profile 2: add extrude_6_profile_2_tool
    add(extrude_6_profile_2_tool.part)


with BuildPart() as extrude_6_profile_3_tool:
    # Эскиз9 → Бобышка-Вытянуть6 profile 3 (with draft: the straight prism first)
    with BuildSketch(Plane(origin=(0, 0, 0), x_dir=(1, 0, 0), z_dir=(0, 1, 0)).offset(EXTRUDE_START_2)):
        with Locations((89.3, -25.2)):
            Circle(SKETCH_9_R)
    extrude(amount=EXTRUDE_6_PROFILE_3_DEPTH)
    # Бобышка-Вытянуть6 profile 3: the draft: its side faces are tilted about the plane it starts from
    extrude_6_profile_3_sides = [extrude_6_profile_3_tool.faces().sort_by_distance(p)[0] for p in [
        (86.3, -9.75, 25.2),
    ]]
    draft(extrude_6_profile_3_sides, Plane(origin=(0, 0, 0), x_dir=(1, 0, 0), z_dir=(0, 1, 0)).offset(EXTRUDE_START_2), EXTRUDE_6_PROFILE_3_DRAFT)


with BuildPart() as part_7:
    add(part_6.part)

    # Бобышка-Вытянуть6 profile 3: add extrude_6_profile_3_tool
    add(extrude_6_profile_3_tool.part)


with BuildPart() as extrude_6_profile_4_tool:
    # Эскиз9 → Бобышка-Вытянуть6 profile 4 (with draft: the straight prism first)
    with BuildSketch(Plane(origin=(0, 0, 0), x_dir=(1, 0, 0), z_dir=(0, 1, 0)).offset(EXTRUDE_START_2)):
        with Locations((17.7, -25.2)):
            Circle(SKETCH_9_R)
    extrude(amount=EXTRUDE_6_PROFILE_4_DEPTH)
    # Бобышка-Вытянуть6 profile 4: the draft: its side faces are tilted about the plane it starts from
    extrude_6_profile_4_sides = [extrude_6_profile_4_tool.faces().sort_by_distance(p)[0] for p in [
        (14.7, -9.75, 25.2),
    ]]
    draft(extrude_6_profile_4_sides, Plane(origin=(0, 0, 0), x_dir=(1, 0, 0), z_dir=(0, 1, 0)).offset(EXTRUDE_START_2), EXTRUDE_6_PROFILE_4_DRAFT)


with BuildPart() as part_8:
    add(part_7.part)

    # Бобышка-Вытянуть6 profile 4: add extrude_6_profile_4_tool
    add(extrude_6_profile_4_tool.part)

    # Эскиз9<3> → Вырез-Вытянуть10 (cut)
    with BuildSketch(Plane(origin=(0, 0, 0), x_dir=(1, 0, 0), z_dir=(0, 1, 0))):
        with Locations(Location((17.7, 25.2, 0), (0, 0, 270))):
            Circle(SKETCH_9_3_R)
        with Locations(Location((89.3, 25.2, 0), (0, 0, 90))):
            Circle(SKETCH_9_3_R)
        with Locations(Location((89.3, -25.2, 0), (0, 0, 270))):
            Circle(SKETCH_9_3_R)
        with Locations(Location((17.7, -25.2, 0), (0, 0, 90))):
            Circle(SKETCH_9_3_R)
    extrude(amount=-CUT_EXTRUDE_10_DEPTH, mode=Mode.SUBTRACT)


solid = part_8.part
